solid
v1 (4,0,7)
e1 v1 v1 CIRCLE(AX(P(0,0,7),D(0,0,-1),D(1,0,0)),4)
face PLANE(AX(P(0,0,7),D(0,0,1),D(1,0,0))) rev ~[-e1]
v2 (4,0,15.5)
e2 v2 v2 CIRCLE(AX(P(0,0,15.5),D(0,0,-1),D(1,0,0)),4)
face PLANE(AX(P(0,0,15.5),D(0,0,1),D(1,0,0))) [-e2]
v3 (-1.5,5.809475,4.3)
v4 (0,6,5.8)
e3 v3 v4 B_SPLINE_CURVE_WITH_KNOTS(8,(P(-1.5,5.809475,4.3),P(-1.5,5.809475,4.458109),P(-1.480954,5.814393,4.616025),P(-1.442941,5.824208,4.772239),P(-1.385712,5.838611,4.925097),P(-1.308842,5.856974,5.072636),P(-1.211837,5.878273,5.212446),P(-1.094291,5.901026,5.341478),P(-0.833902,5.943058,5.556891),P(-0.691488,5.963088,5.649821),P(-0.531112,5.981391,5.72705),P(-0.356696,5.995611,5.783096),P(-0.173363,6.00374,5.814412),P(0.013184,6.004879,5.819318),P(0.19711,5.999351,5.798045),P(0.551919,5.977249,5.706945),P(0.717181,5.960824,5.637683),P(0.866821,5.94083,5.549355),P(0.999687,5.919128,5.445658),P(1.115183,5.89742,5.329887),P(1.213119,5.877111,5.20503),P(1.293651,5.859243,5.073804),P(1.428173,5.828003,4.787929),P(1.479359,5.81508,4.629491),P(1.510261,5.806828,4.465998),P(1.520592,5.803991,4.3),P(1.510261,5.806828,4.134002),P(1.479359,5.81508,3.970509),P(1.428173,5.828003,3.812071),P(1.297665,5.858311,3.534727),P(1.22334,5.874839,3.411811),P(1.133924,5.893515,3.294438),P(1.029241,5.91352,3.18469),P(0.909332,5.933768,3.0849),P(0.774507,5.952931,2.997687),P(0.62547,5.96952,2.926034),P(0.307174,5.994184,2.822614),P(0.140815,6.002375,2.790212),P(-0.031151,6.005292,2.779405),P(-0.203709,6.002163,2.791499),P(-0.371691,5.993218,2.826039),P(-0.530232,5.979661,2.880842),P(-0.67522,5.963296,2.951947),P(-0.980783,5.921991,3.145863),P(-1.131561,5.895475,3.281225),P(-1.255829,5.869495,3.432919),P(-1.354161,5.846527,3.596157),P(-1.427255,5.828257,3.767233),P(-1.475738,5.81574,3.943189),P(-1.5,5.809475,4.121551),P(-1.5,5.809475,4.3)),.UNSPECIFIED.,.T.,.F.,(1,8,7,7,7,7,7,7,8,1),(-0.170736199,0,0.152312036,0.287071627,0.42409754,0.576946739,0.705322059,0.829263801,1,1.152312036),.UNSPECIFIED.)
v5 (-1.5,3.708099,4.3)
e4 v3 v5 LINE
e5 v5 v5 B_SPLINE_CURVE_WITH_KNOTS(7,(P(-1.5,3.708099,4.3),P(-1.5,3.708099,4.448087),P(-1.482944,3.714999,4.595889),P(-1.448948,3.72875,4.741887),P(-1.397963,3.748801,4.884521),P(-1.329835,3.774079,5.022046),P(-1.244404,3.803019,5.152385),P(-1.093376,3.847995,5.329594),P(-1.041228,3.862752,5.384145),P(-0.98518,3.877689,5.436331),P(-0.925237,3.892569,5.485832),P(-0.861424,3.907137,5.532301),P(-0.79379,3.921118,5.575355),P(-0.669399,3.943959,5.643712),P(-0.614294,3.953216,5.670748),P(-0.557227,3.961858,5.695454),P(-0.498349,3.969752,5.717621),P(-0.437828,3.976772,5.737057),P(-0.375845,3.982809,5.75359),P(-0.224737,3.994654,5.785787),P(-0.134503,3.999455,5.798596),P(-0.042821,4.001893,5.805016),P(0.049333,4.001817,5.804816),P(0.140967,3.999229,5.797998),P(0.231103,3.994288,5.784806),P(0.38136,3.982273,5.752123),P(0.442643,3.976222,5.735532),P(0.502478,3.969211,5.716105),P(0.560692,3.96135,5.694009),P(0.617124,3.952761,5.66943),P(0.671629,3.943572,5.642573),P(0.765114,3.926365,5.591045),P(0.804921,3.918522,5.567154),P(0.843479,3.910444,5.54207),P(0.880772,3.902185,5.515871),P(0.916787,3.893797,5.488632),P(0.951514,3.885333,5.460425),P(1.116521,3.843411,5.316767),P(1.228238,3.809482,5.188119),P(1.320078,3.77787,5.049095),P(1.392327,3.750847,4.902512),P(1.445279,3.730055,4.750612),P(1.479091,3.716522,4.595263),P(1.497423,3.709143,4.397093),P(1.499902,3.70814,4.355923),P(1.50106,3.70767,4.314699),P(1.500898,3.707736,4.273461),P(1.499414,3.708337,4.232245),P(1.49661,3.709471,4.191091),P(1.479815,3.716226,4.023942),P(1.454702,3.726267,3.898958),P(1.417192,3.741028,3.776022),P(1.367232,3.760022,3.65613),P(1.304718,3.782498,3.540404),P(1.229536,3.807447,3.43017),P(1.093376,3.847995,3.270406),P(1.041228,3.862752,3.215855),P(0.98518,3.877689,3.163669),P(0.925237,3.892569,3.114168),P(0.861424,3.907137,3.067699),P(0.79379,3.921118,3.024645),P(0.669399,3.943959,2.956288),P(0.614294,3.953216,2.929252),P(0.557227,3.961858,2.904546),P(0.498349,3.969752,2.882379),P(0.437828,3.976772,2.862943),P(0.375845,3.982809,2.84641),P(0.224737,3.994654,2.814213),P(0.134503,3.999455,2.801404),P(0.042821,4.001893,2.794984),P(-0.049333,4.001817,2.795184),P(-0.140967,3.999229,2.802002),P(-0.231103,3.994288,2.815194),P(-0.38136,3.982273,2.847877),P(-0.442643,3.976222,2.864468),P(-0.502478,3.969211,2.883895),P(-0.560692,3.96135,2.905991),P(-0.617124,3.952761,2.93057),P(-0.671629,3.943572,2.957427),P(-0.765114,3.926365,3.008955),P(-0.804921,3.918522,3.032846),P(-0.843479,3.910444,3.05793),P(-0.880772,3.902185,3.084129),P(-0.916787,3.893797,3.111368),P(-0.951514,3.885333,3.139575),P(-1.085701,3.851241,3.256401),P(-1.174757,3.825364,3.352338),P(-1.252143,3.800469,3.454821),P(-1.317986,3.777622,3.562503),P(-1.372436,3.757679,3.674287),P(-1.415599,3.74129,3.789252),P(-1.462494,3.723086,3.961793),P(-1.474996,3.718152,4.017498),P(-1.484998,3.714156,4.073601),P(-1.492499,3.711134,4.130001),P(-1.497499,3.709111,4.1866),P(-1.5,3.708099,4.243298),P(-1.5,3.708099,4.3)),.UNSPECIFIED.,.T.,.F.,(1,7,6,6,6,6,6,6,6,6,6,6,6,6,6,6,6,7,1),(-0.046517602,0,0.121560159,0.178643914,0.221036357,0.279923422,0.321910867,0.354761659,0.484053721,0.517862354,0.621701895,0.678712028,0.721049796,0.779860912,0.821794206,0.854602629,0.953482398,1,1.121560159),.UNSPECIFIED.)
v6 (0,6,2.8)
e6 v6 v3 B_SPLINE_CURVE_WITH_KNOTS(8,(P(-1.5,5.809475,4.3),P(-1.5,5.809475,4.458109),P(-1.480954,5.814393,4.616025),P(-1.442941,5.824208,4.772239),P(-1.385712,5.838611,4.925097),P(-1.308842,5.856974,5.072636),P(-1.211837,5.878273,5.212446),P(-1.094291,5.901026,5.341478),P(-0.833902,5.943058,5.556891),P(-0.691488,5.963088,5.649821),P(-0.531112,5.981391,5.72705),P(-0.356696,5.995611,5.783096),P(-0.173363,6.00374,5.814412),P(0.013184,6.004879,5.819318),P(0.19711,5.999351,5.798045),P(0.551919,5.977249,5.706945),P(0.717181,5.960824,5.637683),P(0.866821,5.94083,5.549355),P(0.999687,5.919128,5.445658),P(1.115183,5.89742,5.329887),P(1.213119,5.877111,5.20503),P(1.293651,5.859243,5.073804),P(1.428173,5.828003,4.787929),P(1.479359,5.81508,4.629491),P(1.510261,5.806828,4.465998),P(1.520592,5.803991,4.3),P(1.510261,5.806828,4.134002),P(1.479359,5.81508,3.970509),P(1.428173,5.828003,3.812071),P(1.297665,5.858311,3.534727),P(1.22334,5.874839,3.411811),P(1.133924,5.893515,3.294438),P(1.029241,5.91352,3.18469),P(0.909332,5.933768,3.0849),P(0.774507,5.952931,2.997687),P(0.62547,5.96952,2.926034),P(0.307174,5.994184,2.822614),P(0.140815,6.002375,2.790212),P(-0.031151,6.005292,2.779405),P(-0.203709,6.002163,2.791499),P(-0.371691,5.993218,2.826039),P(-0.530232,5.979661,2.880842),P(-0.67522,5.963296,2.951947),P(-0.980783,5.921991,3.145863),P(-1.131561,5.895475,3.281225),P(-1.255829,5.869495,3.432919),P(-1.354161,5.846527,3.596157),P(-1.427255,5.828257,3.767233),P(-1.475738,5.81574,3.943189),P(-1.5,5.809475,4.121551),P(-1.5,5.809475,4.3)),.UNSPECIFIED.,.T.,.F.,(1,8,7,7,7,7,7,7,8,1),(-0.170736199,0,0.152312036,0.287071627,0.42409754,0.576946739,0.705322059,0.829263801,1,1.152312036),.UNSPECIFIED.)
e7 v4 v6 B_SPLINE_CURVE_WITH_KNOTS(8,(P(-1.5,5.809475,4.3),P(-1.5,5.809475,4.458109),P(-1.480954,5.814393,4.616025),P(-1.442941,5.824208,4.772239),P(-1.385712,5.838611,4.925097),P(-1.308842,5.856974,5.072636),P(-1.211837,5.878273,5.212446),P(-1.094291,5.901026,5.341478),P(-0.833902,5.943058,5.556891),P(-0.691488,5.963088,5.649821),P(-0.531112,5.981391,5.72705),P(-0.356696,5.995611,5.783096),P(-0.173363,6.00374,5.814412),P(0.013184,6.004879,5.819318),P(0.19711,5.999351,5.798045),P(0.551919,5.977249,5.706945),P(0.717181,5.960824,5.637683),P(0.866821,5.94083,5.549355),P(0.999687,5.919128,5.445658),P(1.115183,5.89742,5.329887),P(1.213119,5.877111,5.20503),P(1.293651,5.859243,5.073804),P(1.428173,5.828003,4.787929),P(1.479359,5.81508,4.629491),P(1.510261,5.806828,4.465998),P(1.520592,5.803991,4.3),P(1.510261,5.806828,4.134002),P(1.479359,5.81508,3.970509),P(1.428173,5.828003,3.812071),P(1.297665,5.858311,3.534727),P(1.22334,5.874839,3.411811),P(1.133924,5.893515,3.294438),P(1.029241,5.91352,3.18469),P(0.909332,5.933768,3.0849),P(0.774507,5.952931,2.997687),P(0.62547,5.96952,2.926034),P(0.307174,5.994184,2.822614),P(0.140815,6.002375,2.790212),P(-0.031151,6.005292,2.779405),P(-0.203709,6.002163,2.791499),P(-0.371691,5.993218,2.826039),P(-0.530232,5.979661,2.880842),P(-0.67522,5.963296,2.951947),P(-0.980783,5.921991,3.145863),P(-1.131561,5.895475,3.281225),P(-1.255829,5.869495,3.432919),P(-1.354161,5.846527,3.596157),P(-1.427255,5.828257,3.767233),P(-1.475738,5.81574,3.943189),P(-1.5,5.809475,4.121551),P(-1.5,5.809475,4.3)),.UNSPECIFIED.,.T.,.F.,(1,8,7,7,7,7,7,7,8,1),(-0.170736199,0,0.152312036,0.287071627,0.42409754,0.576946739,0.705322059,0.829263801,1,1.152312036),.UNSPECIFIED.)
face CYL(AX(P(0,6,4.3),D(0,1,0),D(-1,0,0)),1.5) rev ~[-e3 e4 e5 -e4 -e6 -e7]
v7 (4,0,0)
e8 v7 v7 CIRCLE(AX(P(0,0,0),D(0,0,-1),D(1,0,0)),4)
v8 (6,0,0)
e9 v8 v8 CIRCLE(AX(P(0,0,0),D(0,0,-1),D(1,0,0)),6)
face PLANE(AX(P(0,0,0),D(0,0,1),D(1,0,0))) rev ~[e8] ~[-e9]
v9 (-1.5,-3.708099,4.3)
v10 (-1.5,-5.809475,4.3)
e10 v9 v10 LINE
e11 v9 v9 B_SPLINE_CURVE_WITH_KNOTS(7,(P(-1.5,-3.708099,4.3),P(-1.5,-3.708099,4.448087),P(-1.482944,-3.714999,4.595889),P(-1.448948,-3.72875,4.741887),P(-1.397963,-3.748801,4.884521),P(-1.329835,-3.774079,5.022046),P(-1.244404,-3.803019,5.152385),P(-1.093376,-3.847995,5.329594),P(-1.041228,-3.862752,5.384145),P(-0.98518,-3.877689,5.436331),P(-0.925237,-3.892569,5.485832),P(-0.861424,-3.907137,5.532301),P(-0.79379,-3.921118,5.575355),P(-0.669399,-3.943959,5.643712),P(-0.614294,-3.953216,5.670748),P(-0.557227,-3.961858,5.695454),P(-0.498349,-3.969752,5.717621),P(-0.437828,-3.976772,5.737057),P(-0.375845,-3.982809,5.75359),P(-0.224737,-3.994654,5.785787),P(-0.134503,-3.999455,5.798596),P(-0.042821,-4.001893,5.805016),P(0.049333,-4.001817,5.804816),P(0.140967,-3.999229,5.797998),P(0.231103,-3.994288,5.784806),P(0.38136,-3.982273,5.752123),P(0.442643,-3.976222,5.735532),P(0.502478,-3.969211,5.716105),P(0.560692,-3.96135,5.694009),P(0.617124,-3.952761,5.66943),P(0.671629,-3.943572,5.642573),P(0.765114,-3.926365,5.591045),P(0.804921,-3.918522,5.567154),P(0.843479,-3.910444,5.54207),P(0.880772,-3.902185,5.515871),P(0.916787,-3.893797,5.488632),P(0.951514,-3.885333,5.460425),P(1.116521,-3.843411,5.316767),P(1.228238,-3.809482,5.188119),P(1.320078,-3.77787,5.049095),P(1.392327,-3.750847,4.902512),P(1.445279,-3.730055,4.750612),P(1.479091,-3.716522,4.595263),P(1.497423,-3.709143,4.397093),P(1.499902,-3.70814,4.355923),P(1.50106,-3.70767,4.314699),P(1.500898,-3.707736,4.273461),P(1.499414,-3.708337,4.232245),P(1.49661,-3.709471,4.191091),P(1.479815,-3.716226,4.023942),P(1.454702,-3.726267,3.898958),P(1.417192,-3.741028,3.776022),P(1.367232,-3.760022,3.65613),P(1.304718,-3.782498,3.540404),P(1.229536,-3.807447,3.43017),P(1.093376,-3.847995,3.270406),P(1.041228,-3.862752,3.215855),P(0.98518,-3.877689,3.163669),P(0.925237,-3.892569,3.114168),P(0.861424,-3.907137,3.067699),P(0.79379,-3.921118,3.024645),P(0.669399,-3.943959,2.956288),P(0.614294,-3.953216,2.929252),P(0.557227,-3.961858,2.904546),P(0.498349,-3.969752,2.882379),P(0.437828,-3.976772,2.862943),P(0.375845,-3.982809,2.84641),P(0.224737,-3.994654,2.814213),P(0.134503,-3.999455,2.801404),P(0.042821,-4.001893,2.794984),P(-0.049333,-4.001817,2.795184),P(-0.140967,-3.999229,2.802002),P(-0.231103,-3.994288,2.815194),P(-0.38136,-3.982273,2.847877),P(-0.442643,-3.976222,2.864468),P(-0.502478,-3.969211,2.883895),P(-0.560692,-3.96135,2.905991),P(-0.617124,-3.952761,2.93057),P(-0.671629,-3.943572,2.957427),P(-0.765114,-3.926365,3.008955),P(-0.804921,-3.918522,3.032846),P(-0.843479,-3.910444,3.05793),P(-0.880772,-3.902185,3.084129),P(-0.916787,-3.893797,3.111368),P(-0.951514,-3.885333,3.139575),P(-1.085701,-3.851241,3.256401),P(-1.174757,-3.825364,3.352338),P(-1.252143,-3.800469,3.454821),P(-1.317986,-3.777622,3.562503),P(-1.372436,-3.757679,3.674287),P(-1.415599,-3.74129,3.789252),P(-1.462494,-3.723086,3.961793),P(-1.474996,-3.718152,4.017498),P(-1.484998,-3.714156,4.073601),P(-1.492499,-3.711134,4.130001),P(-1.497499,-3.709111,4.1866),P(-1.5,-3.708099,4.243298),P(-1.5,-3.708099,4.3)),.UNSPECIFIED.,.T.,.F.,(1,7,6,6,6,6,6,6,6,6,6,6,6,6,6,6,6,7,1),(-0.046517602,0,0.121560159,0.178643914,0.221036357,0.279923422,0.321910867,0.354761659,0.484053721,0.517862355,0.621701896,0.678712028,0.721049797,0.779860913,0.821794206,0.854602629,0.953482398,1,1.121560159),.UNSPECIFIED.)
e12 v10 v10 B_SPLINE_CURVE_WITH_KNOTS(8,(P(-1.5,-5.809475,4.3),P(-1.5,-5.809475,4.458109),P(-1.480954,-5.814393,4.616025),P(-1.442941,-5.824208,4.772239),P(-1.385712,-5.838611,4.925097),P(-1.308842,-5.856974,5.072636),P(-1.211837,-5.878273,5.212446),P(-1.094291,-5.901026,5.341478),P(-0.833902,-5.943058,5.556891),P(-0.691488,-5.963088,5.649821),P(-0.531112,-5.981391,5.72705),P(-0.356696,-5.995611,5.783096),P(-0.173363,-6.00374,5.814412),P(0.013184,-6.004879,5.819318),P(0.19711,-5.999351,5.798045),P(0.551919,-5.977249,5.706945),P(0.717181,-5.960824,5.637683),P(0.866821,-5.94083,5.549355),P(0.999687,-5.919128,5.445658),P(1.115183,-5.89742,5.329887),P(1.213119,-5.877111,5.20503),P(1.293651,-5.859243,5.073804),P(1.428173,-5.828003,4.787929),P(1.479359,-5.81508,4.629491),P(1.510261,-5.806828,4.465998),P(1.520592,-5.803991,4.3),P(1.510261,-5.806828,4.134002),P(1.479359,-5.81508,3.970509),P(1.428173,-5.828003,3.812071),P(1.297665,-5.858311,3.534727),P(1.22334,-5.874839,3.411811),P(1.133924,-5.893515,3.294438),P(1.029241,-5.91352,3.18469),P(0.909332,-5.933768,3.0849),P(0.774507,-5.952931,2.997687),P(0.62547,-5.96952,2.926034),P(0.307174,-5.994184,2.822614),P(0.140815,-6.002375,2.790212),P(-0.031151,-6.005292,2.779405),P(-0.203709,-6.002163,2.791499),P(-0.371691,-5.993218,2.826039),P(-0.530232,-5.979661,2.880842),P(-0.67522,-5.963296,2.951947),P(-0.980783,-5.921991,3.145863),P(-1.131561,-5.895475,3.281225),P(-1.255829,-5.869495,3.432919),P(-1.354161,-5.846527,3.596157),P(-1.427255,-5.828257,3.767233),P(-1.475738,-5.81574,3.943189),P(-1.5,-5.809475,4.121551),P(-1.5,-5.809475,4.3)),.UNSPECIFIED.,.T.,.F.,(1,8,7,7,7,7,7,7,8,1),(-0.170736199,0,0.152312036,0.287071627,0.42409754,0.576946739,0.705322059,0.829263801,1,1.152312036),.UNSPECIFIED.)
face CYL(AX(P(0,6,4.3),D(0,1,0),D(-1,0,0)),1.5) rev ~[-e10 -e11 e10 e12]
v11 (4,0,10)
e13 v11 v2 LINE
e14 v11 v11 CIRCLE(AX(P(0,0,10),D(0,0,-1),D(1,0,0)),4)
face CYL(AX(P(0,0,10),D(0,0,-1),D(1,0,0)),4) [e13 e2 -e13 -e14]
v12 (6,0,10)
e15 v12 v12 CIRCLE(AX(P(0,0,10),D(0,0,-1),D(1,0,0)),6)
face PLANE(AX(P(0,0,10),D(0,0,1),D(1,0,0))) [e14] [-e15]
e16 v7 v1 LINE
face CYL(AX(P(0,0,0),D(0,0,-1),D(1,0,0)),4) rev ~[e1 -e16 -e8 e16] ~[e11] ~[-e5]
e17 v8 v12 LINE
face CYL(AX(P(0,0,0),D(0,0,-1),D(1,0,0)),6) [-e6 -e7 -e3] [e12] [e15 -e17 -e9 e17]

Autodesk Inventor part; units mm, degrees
ref_plane "YZ Plane" through (0, 0, 0) normal (1, 0, 0) x (0, 1, 0)
ref_plane "XZ Plane" through (0, 0, 0) normal (0, 1, 0) x (-1, 0, 0)
sketch "Sketch1" plane through (0, 0, 0) normal (0, 0, 1) x (1, 0, 0)
  circle A0 centre (0, 0) radius 4
  circle A1 centre (0, 0) radius 6
  dimension "d0" = 8
  dimension "d1" = 2
extrude "Extrusion1" add sketch "Sketch1" along normal blind 10
sketch "Sketch2" plane through (0, 0, 10) normal (0, 0, 1) x (1, 0, 0)
  circle A0 centre (0, 0) radius 4
  dimension "d4" = 8
extrude "Extrusion2" add sketch "Sketch2" along normal mid plane 6
move faces "Move1" translate (0, 0, 2.5) faces at (0.7574, 1.0973, 13)
sketch "Sketch3" plane through (0, 0, 0) normal (0, 0, -1) x (-1, 0, 0)
  line L0 (0, 0) -> (0, 6)
  circle A0 centre (0, 0) radius 6 projected
ref_plane "Work Plane1" through (0, 6, 0) normal (0, 1, 0) x (-1, 0, 0)
sketch "Sketch4" plane through (0, 6, 0) normal (0, 1, 0) x (-1, 0, 0)
  circle A0 centre (0, 4.3) radius 1.5
  point P0 (0, 0)
  dimension "d10" = 3
  dimension "d11" = 4.3
extrude "Extrusion3" cut sketch "Sketch4" against normal through all
properties part number "shaft_extension"
